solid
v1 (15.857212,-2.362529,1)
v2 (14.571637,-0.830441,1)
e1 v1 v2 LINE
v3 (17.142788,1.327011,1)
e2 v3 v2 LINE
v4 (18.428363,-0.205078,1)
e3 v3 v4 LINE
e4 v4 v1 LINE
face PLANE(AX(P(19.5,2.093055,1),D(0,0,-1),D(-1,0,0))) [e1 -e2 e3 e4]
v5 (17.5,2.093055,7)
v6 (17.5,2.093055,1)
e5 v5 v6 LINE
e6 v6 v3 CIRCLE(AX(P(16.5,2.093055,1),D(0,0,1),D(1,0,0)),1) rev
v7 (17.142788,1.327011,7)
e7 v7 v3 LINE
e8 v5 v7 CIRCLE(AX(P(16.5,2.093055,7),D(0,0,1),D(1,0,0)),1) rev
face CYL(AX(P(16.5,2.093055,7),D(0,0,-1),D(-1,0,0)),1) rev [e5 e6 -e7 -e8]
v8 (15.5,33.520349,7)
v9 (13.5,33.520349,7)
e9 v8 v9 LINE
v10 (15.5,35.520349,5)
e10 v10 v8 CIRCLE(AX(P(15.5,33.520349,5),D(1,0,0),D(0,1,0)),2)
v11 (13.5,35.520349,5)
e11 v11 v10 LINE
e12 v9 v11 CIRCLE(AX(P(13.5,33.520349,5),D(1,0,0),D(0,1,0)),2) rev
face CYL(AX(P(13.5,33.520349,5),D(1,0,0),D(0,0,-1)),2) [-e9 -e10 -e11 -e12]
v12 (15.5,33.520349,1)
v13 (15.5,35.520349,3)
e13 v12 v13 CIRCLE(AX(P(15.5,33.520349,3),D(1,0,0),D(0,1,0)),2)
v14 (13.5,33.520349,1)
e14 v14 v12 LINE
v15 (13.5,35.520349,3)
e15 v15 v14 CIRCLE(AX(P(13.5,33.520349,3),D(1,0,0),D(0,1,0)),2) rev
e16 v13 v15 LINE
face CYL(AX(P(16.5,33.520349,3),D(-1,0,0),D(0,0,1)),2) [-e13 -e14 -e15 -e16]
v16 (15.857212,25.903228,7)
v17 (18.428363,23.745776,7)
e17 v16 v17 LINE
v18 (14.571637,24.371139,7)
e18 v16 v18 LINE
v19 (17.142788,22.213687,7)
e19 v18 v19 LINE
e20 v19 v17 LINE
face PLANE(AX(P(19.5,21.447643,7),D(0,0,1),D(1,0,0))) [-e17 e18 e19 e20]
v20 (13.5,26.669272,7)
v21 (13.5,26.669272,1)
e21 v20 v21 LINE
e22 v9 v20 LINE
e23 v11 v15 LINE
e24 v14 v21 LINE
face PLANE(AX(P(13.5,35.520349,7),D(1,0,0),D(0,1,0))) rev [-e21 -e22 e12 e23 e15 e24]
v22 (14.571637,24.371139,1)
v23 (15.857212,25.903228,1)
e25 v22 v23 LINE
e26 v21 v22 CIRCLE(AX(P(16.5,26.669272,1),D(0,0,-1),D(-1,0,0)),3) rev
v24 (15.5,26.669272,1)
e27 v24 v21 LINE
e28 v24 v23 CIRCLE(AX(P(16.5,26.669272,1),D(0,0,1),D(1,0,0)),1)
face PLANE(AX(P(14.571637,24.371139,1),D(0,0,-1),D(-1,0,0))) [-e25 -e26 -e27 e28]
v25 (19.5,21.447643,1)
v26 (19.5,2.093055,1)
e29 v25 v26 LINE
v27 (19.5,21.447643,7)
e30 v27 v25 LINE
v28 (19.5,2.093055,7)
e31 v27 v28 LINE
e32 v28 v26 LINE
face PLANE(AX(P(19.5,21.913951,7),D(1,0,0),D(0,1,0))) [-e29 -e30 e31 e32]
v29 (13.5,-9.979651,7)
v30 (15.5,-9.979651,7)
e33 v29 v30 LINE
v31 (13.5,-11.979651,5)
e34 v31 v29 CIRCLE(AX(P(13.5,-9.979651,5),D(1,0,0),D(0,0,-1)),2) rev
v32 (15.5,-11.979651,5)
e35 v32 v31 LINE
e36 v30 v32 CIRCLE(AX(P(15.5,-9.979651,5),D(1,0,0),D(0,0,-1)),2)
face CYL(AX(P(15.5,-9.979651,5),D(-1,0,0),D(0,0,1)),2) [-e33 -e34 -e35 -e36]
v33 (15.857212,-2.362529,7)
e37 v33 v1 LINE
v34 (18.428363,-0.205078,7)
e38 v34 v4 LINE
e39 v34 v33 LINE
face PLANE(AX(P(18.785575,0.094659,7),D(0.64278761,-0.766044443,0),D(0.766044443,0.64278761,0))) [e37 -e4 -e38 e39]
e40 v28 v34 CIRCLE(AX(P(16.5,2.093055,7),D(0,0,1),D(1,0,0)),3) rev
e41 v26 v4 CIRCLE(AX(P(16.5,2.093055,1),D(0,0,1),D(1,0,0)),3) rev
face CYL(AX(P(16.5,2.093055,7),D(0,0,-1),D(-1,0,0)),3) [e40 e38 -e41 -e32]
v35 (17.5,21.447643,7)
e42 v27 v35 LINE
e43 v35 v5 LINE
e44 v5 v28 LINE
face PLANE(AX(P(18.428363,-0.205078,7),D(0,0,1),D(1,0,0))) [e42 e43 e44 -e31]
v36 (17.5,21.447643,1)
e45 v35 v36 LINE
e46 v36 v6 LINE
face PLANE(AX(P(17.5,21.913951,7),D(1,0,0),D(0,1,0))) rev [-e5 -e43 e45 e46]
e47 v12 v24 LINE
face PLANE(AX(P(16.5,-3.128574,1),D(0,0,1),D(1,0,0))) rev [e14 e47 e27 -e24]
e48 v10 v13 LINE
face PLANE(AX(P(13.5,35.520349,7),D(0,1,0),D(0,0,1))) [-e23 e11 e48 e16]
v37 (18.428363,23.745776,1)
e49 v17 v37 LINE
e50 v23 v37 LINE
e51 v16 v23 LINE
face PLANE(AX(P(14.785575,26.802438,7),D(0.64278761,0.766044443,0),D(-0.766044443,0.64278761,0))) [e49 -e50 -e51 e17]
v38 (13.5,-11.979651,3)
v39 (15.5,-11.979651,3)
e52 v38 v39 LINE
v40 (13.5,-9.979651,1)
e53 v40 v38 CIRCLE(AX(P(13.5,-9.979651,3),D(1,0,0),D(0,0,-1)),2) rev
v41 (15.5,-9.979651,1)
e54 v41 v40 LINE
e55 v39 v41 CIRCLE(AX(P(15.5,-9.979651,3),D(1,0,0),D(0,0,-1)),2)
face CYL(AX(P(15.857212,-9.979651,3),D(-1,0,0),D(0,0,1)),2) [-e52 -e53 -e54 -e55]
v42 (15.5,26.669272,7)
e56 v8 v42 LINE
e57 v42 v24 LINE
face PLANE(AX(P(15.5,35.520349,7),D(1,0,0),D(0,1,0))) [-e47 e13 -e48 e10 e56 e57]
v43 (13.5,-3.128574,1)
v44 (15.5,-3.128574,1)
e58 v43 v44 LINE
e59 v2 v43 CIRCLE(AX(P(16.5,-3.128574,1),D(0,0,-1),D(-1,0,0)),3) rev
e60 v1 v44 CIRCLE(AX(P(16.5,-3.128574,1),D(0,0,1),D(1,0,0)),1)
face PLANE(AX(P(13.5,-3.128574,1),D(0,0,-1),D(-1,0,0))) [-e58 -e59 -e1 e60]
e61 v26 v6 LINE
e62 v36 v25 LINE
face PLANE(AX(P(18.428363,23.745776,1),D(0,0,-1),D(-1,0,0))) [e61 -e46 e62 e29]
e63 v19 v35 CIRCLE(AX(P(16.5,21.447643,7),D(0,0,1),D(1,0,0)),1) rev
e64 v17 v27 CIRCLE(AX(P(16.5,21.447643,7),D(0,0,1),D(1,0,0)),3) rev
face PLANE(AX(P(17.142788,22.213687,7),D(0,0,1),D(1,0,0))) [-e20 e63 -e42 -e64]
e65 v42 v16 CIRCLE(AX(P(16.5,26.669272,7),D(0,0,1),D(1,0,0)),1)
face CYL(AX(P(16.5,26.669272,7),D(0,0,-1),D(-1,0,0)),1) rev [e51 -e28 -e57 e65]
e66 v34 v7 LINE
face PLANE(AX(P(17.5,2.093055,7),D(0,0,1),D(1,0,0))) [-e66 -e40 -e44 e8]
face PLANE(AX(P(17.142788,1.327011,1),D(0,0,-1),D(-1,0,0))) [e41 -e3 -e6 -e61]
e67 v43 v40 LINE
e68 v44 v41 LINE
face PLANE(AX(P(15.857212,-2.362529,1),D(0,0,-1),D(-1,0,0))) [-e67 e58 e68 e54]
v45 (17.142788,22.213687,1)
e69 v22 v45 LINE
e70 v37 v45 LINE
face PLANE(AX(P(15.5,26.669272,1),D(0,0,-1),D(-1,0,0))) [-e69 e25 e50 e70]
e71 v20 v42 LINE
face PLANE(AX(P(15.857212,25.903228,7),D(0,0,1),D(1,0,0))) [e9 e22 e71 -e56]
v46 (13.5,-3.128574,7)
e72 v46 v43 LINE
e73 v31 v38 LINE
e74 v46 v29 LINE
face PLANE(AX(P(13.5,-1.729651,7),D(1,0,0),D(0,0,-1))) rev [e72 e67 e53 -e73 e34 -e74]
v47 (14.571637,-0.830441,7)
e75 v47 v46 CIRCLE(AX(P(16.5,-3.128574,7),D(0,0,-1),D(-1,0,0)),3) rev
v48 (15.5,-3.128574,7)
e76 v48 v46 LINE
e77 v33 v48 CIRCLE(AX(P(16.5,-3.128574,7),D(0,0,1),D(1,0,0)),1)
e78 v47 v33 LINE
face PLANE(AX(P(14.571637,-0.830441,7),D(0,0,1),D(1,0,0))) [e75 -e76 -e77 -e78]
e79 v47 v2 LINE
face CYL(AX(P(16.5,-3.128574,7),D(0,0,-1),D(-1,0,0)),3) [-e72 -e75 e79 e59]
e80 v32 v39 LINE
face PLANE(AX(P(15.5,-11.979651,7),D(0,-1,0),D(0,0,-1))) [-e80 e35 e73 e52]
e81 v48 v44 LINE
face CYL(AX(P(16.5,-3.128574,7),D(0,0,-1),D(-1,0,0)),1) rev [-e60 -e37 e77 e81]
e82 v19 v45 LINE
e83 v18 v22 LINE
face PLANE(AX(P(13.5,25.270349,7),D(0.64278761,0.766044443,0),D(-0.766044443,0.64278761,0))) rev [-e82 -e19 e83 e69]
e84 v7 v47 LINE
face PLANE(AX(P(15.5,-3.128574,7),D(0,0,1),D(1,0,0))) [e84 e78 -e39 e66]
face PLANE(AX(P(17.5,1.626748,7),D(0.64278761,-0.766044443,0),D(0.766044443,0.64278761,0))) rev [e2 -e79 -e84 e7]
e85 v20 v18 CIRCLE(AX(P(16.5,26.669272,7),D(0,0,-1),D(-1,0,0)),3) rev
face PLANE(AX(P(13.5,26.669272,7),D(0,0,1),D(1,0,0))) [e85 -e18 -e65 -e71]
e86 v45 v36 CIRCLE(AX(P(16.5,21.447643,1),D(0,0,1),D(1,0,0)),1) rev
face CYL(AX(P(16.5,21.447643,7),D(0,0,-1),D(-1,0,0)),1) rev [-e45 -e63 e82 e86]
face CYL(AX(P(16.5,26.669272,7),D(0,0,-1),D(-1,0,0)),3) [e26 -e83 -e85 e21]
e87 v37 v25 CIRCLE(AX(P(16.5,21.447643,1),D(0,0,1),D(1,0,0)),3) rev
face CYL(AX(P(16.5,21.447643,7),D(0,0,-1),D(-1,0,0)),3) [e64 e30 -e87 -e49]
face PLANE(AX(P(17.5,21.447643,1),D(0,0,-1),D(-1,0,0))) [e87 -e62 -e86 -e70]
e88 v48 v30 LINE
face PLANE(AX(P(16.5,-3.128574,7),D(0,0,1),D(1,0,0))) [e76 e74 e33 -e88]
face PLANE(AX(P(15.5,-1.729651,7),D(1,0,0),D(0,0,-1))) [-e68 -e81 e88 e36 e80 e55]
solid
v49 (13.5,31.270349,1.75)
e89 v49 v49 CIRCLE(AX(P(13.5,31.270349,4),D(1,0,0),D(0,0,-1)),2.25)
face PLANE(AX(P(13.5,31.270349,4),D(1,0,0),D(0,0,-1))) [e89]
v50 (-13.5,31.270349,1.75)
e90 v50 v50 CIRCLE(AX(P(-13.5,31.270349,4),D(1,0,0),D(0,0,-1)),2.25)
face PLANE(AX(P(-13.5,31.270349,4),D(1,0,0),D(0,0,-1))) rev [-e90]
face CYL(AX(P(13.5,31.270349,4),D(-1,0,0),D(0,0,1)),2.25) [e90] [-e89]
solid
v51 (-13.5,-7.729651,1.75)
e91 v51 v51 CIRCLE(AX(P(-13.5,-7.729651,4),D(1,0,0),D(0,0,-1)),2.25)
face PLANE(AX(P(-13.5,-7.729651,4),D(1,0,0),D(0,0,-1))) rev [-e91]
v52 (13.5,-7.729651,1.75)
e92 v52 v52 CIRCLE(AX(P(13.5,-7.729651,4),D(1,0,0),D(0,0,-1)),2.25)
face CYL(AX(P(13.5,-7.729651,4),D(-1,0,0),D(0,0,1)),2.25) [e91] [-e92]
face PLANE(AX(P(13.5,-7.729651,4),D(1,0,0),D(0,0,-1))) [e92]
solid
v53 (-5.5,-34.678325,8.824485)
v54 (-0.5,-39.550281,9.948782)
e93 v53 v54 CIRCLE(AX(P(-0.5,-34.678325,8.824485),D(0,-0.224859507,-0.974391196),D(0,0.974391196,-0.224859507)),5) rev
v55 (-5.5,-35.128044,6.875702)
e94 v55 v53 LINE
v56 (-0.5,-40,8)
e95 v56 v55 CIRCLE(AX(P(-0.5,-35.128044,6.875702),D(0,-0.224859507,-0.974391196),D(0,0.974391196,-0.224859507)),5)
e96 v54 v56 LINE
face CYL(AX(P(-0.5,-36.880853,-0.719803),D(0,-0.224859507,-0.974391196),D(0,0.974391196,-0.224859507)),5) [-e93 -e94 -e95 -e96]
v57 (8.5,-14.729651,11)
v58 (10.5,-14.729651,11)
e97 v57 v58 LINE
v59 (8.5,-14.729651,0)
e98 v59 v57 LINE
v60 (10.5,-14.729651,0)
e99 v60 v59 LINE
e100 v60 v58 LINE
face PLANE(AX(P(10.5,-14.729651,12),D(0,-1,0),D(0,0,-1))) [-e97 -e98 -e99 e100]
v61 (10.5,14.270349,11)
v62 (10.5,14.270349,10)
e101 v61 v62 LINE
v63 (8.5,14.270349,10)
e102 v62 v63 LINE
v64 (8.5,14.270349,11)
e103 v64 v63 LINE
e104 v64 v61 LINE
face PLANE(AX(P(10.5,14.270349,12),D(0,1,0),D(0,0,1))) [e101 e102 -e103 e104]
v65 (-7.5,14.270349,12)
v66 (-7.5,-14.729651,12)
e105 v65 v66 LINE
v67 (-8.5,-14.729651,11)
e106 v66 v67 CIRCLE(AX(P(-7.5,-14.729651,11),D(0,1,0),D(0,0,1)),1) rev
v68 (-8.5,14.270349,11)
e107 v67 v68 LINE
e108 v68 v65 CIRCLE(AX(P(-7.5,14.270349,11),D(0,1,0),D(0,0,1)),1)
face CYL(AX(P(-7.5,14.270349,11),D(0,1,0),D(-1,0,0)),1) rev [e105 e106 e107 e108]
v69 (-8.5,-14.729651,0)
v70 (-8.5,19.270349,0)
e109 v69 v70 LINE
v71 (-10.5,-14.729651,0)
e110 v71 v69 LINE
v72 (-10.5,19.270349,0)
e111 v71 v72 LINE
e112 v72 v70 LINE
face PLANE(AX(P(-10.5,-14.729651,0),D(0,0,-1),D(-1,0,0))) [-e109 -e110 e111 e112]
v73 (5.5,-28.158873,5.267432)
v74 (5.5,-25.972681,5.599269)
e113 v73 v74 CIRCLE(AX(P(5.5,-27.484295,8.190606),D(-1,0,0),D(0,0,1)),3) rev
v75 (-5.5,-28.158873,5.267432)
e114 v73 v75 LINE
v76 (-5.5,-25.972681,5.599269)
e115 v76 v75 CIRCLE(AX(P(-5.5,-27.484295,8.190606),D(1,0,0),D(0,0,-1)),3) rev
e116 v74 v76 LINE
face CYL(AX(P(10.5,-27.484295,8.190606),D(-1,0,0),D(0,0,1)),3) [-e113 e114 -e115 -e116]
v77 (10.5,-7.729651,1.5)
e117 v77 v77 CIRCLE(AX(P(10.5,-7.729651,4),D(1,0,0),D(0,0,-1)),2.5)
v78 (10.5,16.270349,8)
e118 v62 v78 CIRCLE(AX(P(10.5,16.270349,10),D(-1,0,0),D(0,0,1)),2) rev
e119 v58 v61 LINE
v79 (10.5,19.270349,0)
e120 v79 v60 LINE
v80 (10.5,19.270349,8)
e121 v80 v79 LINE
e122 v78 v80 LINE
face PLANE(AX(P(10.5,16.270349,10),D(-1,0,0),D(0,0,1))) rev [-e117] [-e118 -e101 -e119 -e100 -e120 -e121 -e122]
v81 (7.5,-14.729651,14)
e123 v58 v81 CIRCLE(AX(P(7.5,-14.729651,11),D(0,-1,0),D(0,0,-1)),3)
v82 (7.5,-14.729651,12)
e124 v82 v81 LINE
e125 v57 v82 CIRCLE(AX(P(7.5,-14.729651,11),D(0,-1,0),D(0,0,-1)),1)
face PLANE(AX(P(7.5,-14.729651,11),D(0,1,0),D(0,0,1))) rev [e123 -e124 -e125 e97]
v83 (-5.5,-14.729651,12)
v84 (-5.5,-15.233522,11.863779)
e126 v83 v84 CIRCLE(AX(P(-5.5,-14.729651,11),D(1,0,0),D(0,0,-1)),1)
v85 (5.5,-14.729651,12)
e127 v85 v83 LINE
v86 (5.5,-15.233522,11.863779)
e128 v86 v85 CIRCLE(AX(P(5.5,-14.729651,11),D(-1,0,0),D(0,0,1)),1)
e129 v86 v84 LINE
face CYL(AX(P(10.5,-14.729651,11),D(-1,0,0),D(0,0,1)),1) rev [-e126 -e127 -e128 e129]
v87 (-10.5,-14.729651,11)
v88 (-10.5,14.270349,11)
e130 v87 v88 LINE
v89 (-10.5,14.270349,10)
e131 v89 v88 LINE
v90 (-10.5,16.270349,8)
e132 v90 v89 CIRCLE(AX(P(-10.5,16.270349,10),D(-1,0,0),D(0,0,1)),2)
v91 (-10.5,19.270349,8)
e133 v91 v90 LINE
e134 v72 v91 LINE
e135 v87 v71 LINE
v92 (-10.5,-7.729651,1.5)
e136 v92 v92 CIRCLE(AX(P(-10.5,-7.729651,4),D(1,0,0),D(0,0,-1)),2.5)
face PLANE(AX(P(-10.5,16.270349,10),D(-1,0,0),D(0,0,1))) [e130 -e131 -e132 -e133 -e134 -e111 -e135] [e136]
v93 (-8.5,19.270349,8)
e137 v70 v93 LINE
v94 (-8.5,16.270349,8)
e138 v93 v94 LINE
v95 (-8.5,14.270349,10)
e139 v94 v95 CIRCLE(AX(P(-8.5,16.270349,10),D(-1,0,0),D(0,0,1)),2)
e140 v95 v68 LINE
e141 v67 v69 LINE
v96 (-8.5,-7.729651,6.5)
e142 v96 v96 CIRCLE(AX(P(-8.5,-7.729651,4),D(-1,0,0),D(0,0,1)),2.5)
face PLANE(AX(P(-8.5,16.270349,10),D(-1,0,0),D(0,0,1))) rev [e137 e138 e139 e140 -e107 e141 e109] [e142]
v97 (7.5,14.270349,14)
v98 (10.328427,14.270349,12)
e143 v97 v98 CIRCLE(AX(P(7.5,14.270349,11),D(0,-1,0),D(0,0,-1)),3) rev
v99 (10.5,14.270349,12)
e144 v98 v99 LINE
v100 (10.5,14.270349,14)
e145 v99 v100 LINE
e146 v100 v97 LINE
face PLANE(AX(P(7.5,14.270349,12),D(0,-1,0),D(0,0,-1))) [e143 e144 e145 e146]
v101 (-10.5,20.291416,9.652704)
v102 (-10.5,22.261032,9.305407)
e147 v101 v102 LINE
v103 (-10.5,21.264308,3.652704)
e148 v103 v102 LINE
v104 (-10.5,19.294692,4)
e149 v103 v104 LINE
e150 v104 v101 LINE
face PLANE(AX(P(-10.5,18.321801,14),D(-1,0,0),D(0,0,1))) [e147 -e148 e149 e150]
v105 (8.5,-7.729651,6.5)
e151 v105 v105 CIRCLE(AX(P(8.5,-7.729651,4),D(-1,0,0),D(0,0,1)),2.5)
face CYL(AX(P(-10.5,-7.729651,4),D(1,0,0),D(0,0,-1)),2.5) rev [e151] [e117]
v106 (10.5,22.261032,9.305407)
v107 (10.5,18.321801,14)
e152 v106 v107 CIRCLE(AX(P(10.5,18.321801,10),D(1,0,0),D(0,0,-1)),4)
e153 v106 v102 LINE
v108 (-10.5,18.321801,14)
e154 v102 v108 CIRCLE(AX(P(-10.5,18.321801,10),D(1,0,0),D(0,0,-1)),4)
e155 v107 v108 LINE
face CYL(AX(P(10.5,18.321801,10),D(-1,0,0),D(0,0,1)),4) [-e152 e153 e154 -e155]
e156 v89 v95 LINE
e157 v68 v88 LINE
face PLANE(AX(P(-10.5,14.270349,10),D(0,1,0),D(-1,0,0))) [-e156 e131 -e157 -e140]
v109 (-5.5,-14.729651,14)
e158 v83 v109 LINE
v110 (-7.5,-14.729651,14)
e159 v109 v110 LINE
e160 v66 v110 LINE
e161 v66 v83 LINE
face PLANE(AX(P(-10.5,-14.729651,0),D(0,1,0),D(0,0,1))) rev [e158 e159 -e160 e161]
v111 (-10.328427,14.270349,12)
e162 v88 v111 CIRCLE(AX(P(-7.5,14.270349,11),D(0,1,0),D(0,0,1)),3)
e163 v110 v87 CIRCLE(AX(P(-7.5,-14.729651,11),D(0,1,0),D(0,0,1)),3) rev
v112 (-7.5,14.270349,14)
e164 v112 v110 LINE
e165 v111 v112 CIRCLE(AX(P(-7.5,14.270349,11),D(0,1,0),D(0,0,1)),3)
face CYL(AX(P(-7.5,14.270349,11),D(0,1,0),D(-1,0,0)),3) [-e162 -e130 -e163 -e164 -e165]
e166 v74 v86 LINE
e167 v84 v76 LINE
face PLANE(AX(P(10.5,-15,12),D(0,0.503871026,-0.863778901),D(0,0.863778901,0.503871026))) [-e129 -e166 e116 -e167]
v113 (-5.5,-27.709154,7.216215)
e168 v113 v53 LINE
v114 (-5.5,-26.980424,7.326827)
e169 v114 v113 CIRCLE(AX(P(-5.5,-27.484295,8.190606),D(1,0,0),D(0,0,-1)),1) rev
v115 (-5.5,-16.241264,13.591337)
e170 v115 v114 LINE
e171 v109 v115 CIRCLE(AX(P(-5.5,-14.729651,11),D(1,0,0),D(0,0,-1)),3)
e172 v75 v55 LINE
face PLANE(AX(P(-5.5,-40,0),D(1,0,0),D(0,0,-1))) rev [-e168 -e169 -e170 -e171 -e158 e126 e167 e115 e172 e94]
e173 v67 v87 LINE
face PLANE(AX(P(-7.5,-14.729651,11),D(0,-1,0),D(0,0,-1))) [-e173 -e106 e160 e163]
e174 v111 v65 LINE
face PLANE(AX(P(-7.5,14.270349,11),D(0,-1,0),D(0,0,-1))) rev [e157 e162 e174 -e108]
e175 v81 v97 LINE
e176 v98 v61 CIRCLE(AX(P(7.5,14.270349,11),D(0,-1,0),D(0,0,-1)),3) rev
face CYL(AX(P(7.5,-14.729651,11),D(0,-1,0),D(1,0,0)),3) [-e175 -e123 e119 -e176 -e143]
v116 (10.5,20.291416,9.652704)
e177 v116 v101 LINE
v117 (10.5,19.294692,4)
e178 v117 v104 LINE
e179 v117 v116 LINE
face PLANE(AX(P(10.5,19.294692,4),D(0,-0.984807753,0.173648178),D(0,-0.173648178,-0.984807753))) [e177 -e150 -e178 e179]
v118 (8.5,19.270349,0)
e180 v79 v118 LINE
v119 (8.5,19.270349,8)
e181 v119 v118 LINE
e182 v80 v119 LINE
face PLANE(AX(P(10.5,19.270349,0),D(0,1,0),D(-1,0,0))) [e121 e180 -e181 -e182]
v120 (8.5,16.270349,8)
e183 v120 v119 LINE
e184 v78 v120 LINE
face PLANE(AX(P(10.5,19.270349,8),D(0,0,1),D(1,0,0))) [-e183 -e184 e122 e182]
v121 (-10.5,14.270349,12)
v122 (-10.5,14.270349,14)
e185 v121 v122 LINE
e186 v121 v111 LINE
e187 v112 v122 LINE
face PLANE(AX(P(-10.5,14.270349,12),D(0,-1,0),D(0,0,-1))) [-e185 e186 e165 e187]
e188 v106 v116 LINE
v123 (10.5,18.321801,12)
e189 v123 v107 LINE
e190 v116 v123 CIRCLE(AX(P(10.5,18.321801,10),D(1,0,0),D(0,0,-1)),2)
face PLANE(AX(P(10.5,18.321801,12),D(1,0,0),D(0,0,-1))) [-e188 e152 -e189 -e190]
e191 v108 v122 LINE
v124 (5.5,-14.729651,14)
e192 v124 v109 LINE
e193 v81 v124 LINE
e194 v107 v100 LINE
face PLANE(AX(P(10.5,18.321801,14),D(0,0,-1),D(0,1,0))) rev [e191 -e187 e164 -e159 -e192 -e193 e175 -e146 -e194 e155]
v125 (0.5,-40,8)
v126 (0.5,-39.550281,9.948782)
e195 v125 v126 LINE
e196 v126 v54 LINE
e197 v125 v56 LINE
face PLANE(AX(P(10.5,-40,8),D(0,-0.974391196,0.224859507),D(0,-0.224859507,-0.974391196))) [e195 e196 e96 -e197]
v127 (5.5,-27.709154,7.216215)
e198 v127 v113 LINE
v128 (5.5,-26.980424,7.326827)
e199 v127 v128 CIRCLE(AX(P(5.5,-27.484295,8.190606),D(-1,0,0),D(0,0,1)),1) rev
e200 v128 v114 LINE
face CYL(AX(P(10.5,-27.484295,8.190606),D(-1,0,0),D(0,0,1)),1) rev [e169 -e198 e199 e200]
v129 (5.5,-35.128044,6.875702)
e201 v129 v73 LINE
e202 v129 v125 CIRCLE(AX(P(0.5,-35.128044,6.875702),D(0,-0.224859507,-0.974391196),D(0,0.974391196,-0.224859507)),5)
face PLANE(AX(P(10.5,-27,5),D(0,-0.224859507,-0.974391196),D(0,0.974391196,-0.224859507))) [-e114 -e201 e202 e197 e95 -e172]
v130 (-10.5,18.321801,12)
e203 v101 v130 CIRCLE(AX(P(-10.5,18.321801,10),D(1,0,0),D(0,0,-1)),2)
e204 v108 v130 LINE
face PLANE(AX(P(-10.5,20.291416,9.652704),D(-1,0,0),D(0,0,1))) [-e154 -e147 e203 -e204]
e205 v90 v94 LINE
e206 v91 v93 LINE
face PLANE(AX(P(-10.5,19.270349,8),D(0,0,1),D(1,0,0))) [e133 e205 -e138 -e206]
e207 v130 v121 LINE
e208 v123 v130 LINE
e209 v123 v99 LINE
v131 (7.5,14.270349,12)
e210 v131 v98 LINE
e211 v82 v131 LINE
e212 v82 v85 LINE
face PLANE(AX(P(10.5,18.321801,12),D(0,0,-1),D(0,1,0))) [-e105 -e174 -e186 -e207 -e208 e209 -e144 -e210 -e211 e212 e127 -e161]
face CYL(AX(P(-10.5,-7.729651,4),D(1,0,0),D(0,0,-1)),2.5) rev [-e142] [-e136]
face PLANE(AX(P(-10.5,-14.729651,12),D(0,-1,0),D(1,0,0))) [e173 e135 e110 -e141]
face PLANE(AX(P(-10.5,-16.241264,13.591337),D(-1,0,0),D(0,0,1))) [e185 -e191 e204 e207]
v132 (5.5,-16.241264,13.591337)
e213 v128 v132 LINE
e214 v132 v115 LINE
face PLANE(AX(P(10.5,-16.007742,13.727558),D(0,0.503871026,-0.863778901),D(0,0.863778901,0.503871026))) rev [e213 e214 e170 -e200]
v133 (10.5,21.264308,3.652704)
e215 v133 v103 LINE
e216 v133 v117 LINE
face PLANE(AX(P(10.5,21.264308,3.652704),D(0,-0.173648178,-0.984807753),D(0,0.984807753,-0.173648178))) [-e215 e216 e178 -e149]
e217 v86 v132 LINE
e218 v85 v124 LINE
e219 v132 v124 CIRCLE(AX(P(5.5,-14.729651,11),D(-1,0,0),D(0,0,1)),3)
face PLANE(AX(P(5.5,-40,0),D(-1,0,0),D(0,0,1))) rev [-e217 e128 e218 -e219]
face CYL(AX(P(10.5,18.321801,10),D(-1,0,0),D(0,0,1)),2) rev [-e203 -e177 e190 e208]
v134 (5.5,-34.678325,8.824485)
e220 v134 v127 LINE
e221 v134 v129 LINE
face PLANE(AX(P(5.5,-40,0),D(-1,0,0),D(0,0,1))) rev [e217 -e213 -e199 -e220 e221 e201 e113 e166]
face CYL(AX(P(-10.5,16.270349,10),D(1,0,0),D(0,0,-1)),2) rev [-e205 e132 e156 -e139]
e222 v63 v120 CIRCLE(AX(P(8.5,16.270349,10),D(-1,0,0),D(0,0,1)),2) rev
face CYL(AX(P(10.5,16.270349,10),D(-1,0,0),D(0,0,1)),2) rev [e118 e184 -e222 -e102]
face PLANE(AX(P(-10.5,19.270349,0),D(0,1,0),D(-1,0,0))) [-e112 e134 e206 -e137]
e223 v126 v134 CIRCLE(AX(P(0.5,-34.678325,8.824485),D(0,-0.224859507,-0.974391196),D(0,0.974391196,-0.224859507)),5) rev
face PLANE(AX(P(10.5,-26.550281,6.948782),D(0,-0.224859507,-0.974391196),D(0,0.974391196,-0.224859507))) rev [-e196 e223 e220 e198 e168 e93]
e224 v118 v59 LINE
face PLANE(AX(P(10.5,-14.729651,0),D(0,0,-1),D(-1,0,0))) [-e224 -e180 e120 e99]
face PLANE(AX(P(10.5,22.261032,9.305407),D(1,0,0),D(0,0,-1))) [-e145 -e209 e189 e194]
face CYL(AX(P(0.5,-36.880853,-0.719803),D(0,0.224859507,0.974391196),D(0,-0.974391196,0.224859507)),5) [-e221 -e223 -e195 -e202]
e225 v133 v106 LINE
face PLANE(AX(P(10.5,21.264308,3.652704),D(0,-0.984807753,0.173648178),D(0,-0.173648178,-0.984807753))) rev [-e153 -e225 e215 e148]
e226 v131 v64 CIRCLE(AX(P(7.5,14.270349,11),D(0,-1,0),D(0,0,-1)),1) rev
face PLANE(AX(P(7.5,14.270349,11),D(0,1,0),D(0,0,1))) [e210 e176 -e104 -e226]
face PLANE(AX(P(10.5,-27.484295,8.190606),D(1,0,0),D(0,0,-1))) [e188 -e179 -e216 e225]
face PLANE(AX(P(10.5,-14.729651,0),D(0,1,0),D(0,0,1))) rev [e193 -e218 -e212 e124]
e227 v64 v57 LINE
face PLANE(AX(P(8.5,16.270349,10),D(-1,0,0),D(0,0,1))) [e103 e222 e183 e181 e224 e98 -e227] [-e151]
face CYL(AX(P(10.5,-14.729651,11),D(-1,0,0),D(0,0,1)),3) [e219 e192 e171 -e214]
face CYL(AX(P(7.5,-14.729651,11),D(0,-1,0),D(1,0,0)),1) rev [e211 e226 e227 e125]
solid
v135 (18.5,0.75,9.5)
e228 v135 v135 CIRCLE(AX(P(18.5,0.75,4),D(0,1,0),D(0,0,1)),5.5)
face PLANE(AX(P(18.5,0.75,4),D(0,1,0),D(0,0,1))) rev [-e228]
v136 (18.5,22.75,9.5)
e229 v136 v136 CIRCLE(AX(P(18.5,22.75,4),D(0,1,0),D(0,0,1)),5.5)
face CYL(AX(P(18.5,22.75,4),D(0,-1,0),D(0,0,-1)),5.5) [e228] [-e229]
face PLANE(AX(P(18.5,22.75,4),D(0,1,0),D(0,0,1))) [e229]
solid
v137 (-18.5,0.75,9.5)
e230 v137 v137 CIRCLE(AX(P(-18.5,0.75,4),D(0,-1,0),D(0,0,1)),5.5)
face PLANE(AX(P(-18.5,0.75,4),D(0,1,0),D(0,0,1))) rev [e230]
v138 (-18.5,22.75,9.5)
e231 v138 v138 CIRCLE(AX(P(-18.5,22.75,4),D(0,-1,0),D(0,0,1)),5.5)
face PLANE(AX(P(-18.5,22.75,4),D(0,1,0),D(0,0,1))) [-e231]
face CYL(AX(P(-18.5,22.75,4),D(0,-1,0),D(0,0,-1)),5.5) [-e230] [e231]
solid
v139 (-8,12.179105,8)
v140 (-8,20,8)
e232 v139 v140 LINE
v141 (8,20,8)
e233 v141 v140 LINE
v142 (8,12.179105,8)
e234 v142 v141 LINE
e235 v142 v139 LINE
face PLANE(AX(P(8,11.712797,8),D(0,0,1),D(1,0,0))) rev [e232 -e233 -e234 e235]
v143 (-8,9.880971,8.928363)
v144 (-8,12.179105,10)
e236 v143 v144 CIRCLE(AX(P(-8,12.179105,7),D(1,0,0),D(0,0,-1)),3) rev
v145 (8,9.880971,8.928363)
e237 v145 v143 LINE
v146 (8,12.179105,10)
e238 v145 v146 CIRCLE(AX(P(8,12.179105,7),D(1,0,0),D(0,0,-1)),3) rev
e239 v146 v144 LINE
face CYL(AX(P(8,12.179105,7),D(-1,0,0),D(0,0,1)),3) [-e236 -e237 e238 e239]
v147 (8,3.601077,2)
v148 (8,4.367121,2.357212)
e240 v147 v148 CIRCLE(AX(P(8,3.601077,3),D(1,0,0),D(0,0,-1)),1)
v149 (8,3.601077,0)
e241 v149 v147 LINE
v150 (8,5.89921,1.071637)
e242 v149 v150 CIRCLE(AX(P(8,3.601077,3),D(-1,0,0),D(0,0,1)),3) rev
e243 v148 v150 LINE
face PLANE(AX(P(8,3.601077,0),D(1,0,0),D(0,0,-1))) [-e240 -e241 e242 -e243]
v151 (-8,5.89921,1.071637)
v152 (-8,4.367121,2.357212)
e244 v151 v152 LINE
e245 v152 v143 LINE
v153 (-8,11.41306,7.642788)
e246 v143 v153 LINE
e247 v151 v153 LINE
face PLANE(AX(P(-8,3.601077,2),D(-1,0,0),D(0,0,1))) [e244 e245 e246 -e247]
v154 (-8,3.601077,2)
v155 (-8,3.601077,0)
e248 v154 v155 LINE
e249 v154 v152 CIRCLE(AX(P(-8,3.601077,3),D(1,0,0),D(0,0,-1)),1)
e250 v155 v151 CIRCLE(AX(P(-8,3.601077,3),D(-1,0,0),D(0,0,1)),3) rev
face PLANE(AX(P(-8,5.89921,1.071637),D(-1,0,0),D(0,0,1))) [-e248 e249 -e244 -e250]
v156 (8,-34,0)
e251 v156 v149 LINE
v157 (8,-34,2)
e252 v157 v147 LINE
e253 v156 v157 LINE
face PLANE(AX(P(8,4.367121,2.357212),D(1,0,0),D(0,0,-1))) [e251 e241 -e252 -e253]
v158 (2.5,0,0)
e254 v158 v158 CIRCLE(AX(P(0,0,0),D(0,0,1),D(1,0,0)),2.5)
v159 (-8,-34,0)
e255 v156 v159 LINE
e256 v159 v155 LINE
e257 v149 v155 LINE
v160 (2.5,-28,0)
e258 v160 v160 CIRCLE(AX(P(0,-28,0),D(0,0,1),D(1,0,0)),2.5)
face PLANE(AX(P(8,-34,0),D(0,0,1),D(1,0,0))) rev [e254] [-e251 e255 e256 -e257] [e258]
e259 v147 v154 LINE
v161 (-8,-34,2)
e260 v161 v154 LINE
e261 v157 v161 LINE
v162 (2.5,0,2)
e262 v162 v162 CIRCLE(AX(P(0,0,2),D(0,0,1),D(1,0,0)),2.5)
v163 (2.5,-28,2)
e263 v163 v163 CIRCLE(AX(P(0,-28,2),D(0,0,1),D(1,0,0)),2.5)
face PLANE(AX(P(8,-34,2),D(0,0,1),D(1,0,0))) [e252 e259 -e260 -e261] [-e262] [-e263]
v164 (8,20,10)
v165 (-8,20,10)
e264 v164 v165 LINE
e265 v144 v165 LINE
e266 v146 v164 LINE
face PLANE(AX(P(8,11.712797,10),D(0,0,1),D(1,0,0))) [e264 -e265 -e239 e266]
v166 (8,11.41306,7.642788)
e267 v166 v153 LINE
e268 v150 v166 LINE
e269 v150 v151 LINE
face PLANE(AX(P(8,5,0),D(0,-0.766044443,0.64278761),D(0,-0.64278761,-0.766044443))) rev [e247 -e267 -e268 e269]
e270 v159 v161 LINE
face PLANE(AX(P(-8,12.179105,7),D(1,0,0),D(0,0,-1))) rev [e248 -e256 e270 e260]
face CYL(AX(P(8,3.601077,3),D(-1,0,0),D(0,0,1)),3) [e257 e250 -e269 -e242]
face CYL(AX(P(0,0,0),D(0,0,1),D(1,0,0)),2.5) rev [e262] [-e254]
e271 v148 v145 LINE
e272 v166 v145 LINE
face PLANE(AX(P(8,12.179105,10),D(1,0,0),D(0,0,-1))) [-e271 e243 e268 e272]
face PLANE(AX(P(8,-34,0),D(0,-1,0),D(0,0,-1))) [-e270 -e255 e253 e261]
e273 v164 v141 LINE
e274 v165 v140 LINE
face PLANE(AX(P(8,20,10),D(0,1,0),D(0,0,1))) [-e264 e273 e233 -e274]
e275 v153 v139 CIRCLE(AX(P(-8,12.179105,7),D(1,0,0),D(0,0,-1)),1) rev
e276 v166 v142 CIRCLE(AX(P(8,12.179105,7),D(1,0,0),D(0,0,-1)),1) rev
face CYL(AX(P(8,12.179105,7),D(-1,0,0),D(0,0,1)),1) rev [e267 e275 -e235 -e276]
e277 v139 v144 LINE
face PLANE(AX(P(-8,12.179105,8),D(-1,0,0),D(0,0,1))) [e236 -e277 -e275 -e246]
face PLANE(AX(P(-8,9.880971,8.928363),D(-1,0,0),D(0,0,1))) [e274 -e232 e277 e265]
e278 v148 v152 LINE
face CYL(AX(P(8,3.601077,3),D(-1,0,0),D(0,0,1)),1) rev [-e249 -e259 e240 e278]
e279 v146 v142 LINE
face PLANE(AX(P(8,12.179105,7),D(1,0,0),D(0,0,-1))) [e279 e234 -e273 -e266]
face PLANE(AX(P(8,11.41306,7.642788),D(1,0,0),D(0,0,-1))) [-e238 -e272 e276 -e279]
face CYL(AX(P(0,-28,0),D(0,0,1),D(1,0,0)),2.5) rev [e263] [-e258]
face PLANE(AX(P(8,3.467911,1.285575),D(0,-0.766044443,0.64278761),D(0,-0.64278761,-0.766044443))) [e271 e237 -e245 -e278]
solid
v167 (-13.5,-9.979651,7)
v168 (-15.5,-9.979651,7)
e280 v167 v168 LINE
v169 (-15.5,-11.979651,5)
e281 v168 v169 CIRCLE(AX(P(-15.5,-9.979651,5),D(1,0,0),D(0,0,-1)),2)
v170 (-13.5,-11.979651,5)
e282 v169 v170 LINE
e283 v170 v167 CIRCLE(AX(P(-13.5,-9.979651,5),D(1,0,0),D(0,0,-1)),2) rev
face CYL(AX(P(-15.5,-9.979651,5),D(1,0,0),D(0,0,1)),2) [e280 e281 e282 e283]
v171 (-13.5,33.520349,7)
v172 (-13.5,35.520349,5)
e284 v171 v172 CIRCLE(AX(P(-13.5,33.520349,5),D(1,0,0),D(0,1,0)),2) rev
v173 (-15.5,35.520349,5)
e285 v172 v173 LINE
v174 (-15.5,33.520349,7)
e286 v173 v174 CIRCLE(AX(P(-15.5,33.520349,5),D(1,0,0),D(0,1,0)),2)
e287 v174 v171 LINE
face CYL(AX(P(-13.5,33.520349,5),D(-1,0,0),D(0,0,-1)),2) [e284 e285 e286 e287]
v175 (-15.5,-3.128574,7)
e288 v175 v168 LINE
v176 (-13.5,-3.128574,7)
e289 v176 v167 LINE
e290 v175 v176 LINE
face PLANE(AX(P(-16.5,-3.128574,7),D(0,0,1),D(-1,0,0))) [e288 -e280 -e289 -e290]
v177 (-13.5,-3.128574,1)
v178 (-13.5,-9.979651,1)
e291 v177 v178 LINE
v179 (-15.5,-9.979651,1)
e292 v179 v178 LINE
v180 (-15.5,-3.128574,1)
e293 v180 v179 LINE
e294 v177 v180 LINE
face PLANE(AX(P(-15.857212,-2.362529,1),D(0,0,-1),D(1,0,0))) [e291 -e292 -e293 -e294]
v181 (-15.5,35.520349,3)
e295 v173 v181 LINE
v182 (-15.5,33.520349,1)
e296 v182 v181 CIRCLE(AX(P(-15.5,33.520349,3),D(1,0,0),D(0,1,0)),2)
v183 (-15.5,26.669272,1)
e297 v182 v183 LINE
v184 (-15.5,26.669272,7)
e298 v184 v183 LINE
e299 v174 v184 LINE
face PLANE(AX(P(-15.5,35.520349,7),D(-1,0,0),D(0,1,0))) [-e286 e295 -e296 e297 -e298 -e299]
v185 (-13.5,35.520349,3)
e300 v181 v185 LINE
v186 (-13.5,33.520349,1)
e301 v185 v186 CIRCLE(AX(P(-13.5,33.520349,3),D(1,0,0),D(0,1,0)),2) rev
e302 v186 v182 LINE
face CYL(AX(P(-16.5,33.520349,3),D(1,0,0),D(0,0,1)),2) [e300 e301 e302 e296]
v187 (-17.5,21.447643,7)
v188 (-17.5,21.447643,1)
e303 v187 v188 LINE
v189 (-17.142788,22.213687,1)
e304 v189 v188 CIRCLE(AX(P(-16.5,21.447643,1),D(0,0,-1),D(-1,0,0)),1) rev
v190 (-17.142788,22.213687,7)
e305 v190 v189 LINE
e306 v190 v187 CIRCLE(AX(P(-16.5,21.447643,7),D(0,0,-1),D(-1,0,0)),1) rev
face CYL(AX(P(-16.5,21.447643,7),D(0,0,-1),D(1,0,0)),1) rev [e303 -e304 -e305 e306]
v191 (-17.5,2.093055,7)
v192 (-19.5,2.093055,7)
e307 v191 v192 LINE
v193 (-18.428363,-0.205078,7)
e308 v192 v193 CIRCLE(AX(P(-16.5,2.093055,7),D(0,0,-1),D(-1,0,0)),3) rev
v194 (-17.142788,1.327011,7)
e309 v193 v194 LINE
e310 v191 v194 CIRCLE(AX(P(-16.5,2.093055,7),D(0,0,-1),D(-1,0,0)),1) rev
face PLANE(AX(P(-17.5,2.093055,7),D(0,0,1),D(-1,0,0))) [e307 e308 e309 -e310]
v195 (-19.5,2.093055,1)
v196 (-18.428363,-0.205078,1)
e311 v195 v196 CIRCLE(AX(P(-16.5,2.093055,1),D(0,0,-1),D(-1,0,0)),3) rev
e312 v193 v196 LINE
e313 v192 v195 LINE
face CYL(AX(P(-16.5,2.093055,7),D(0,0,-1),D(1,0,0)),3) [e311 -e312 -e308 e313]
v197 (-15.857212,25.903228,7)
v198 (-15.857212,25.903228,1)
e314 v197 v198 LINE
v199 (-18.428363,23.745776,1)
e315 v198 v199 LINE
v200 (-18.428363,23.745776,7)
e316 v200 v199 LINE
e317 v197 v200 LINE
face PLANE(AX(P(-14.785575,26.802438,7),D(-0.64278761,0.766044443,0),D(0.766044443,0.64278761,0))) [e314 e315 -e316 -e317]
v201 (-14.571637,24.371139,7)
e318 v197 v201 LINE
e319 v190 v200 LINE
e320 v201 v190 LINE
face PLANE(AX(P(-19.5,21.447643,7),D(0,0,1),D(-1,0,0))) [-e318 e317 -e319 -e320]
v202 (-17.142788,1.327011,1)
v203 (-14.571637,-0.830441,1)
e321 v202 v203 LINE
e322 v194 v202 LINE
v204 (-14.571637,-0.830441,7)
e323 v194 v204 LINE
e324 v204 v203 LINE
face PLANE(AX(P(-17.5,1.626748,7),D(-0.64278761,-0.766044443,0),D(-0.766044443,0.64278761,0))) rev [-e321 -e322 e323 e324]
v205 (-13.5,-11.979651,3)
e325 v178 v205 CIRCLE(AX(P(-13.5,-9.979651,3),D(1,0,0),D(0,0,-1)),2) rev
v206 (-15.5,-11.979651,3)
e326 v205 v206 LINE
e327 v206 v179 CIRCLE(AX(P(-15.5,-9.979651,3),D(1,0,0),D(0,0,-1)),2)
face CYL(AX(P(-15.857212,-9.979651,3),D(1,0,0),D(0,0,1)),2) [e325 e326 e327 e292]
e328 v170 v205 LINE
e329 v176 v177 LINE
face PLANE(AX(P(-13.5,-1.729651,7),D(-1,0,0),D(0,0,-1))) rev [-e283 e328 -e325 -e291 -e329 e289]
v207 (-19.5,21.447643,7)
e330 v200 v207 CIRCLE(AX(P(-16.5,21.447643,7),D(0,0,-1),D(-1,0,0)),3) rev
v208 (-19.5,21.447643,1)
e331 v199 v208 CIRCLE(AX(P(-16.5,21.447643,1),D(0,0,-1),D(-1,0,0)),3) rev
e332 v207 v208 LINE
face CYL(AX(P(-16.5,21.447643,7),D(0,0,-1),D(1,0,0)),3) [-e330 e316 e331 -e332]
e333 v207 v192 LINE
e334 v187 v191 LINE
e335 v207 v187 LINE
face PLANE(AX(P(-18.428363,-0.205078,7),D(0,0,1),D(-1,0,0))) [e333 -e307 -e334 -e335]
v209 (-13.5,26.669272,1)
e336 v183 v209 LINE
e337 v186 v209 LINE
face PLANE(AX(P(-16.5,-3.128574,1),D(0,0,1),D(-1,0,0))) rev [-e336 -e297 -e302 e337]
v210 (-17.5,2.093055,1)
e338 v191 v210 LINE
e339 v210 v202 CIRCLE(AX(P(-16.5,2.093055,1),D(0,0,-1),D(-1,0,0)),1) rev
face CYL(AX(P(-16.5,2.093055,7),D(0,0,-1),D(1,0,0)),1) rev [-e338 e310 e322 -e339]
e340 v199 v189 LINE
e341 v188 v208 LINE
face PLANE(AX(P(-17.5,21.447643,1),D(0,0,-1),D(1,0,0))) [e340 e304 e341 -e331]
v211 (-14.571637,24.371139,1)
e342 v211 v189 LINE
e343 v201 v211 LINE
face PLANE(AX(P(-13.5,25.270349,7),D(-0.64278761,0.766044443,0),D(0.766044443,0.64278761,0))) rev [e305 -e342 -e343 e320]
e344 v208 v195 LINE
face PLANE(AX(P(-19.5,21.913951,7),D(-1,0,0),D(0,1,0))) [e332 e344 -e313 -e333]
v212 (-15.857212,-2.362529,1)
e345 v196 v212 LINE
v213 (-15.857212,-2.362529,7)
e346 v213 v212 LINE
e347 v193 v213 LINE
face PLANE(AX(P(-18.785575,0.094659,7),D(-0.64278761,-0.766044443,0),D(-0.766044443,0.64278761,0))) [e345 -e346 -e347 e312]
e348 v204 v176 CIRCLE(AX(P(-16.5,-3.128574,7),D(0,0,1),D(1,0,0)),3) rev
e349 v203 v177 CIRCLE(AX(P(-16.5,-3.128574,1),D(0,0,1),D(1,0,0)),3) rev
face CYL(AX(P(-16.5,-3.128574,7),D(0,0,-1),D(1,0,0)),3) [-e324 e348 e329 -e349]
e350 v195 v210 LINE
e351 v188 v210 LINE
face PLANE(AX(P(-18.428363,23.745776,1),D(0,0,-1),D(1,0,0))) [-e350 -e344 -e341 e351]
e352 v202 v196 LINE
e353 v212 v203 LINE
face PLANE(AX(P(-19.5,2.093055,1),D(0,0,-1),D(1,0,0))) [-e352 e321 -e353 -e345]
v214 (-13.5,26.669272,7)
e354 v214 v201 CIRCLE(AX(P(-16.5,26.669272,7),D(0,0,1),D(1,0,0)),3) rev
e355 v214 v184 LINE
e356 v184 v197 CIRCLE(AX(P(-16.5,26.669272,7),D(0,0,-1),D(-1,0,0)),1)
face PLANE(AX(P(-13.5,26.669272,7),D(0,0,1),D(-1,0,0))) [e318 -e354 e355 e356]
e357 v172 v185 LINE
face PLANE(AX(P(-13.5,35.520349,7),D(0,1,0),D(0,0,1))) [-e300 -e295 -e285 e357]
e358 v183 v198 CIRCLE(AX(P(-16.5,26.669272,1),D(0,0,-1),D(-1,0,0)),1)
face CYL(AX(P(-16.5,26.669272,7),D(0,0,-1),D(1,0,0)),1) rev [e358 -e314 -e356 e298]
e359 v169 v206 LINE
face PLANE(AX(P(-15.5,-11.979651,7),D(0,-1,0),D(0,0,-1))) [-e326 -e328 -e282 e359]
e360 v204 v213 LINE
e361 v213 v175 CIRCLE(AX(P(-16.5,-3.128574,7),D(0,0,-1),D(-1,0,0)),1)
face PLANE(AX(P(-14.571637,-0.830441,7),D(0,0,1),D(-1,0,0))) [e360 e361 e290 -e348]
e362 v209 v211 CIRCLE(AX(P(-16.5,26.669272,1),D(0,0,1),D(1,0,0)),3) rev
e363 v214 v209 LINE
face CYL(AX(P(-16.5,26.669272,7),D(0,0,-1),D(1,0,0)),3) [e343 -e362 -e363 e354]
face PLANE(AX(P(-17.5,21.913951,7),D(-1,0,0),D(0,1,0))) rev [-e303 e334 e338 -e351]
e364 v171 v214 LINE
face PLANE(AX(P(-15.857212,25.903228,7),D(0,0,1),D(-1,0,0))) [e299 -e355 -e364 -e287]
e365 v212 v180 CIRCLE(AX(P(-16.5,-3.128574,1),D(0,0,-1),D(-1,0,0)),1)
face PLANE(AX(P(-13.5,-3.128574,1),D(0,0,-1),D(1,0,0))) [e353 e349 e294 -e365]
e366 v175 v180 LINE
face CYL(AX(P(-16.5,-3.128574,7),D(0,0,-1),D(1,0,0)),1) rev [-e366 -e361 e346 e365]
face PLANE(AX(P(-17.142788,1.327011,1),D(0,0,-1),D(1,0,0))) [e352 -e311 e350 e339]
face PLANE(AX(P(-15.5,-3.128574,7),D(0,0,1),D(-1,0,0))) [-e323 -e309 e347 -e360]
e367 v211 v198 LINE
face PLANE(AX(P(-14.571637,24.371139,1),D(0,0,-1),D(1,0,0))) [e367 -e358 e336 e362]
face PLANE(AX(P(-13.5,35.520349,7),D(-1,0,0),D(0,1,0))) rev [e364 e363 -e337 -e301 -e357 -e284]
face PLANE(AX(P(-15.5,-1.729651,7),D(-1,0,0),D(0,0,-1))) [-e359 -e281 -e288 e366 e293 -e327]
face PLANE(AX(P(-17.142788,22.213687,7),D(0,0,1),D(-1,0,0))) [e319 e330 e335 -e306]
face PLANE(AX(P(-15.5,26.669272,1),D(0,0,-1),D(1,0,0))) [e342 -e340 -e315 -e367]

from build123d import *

# Parameters (mm, degrees)
T_LE_DE_BASE_PLI_E1_DEPTH               = 8
ESQUISSE6_R                             = 2.5
ENL_V_MAT_EXTRU_1_DEPTH                 = 2
T_LE_DE_BASE_PLI_E2_DEPTH               = 10.5
ESQUISSE10_W                            = 5
ESQUISSE10_H                            = 25.270349141
ENL_V_MAT_EXTRU_2_DEPTH                 = 44.660622991
T_LE_PLI_E_SUR_AR_TE1_STRIP_W           = 10
T_LE_PLI_E_SUR_AR_TE1_STRIP_H           = 2
T_LE_PLI_E_SUR_AR_TE1_STRIP_CUT_DEPTH   = 29
T_LE_PLI_E_SUR_AR_TE1_STRIP_2_W         = 10
T_LE_PLI_E_SUR_AR_TE1_STRIP_2_H         = 2
T_LE_PLI_E_SUR_AR_TE1_STRIP_CUT_2_DEPTH = 29
T_LE_PLI_E_SUR_AR_TE1_DEPTH             = 29
T_LE_PLI_E_SUR_AR_TE1_FLAT_DEPTH        = 2
T_LE_PLI_E_SUR_AR_TE1_BEND_DEPTH        = 29
T_LE_PLI_E_SUR_AR_TE1_FLAT_2_DEPTH      = 2
CONG_1_R                                = 5
ESQUISSE17_R                            = 2.5
ENL_V_MAT_EXTRU_3_DEPTH                 = 48.296934362
ESQUISSE18_R                            = 2.25
BOSS_EXTRU_1_DEPTH                      = 13.5
BOSS_EXTRU_1_2_DEPTH                    = 13.5
T_LE_DE_BASE_PLI_E3_DEPTH               = 6
CONG_2_R                                = 2
BOSS_EXTRU_2_START                      = 0.75
ESQUISSE24_R                            = 5.5
BOSS_EXTRU_2_DEPTH                      = 22


# Sheet-metal steps are written as plain solids
with BuildPart() as part:
    # Esquisse1 → Tôle de base pliée1 (new, symmetric)
    with BuildSketch(Plane(origin=(0, 0, 0), x_dir=(0, 0, -1), z_dir=(1, 0, 0))):
        with BuildLine():
            Line((0, -34), (0, 3.601077026))
            ThreePointArc((0, 3.601077026), (-0.281076639, 4.868931811), (-1.071637171, 5.899210355))
            Line((-1.071637171, 5.899210355), (-7.64278761, 11.413060264))
            ThreePointArc((-7.64278761, 11.413060264), (-7.906307787, 11.756486446), (-8, 12.179104708))
            Line((-8, 12.179104708), (-8, 20))
            Line((-8, 20), (-10, 20))
            Line((-10, 20), (-10, 12.179104708))
            ThreePointArc((-10, 12.179104708), (-9.718923361, 10.911249922), (-8.928362829, 9.880971378))
            Line((-8.928362829, 9.880971378), (-2.35721239, 4.367121469))
            ThreePointArc((-2.35721239, 4.367121469), (-2.093692213, 4.023695287), (-2, 3.601077026))
            Line((-2, 3.601077026), (-2, -34))
            Line((-2, -34), (0, -34))
        make_face()
    extrude(amount=T_LE_DE_BASE_PLI_E1_DEPTH, both=True)

    # Esquisse6 → Enlèv. mat.-Extru.1 (cut)
    with BuildSketch(Plane.XY.offset(2)):
        Circle(ESQUISSE6_R)
        with Locations((0, -28)):
            Circle(ESQUISSE6_R)
    extrude(amount=-ENL_V_MAT_EXTRU_1_DEPTH, mode=Mode.SUBTRACT)


with BuildPart() as body_2:
    # Esquisse7 → Tôle de base pliée2 (new, symmetric)
    with BuildSketch(Plane(origin=(0, 0, 0), x_dir=(0, 0, -1), z_dir=(1, 0, 0))):
        with BuildLine():
            Line((-4, 19.294692077), (-9.652703645, 20.291416244))
            ThreePointArc((-9.652703645, 20.291416244), (-11.285575219, 19.853889624), (-12, 18.321800738))
            Line((-12, 18.321800738), (-12, -14.729650859))
            ThreePointArc((-12, -14.729650859), (-11.965344213, -14.990630838), (-11.863778901, -15.233521884))
            Line((-11.863778901, -15.233521884), (-5.599269134, -25.972681485))
            ThreePointArc((-5.599269134, -25.972681485), (-5.224579141, -27.03408834), (-5.26743225, -28.158873081))
            Line((-5.26743225, -28.158873081), (-8, -40))
            Line((-8, -40), (-9.948782391, -39.550280987))
            Line((-9.948782391, -39.550280987), (-7.216214641, -27.709154068))
            ThreePointArc((-7.216214641, -27.709154068), (-7.201930271, -27.334225821), (-7.326826936, -26.980423536))
            Line((-7.326826936, -26.980423536), (-13.591336703, -16.241263935))
            ThreePointArc((-13.591336703, -16.241263935), (-13.89603264, -15.512590796), (-14, -14.729650859))
            Line((-14, -14.729650859), (-14, 18.321800738))
            ThreePointArc((-14, 18.321800738), (-12.571150439, 21.38597851), (-9.305407289, 22.26103175))
            Line((-9.305407289, 22.26103175), (-3.652703645, 21.264307583))
            Line((-3.652703645, 21.264307583), (-4, 19.294692077))
        make_face()
    extrude(amount=T_LE_DE_BASE_PLI_E2_DEPTH, both=True)

    # Esquisse10 → Enlèv. mat.-Extru.2 (cut, through all)
    with BuildSketch(Plane.XY.offset(14)):
        with Locations((-8, -27.36482543)):
            Rectangle(ESQUISSE10_W, ESQUISSE10_H)
        with Locations((8, -27.36482543)):
            Rectangle(ESQUISSE10_W, ESQUISSE10_H)
    extrude(amount=-ENL_V_MAT_EXTRU_2_DEPTH, mode=Mode.SUBTRACT)

    # Tôle pliée sur arête1 strip (across the edge) → Tôle pliée sur arête1 strip cut (cut)
    with BuildSketch(Plane(origin=(10.5, 14.270349141, 12), x_dir=(-1, 0, 0), z_dir=(0, -1, 0))):
        with Locations((-2, -1)):
            Rectangle(T_LE_PLI_E_SUR_AR_TE1_STRIP_W, T_LE_PLI_E_SUR_AR_TE1_STRIP_H)
    extrude(amount=T_LE_PLI_E_SUR_AR_TE1_STRIP_CUT_DEPTH, mode=Mode.SUBTRACT)

    # Tôle pliée sur arête1 strip 2 (across the edge) → Tôle pliée sur arête1 strip cut 2 (cut)
    with BuildSketch(Plane(origin=(-10.5, -14.729650859, 12), x_dir=(1, 0, 0), z_dir=(0, 1, 0))):
        with Locations((-2, -1)):
            Rectangle(T_LE_PLI_E_SUR_AR_TE1_STRIP_2_W, T_LE_PLI_E_SUR_AR_TE1_STRIP_2_H)
    extrude(amount=T_LE_PLI_E_SUR_AR_TE1_STRIP_CUT_2_DEPTH, mode=Mode.SUBTRACT)

    # Tôle pliée sur arête1 bend section (across the edge) → Tôle pliée sur arête1 (add)
    with BuildSketch(Plane(origin=(10.5, 14.270349141, 12), x_dir=(-1, 0, 0), z_dir=(0, -1, 0))):
        with BuildLine():
            Line((0, 1), (2, 1))
            ThreePointArc((2, 1), (2.292893219, 0.292893219), (3, 0))
            Line((3, 0), (3, -2))
            ThreePointArc((3, -2), (0.878679656, -1.121320344), (0, 1))
        make_face()
    extrude(amount=T_LE_PLI_E_SUR_AR_TE1_DEPTH)

    # Tôle pliée sur arête1 profile (on flange) → Tôle pliée sur arête1 flat (add)
    with BuildSketch(Plane(origin=(10.5, 0, 12), x_dir=(0, 1, 0), z_dir=(-1, 0, 0))):
        with BuildLine():
            ThreePointArc((14.270349141, 2), (14.856135579, 3.414213562), (16.270349141, 4))
            Line((16.270349141, 4), (19.270349141, 4))
            Line((19.270349141, 4), (19.270349141, 12))
            Line((19.270349141, 12), (-14.729650859, 12))
            Line((-14.729650859, 12), (-14.729650859, 1))
            Line((-14.729650859, 1), (14.270349141, 1))
            Line((14.270349141, 1), (14.270349141, 2))
        make_face()
    extrude(amount=T_LE_PLI_E_SUR_AR_TE1_FLAT_DEPTH)

    # Tôle pliée sur arête1 bend section 2 (across the edge) → Tôle pliée sur arête1 bend (add)
    with BuildSketch(Plane(origin=(-10.5, -14.729650859, 12), x_dir=(1, 0, 0), z_dir=(0, 1, 0))):
        with BuildLine():
            Line((0, 1), (2, 1))
            ThreePointArc((2, 1), (2.292893219, 0.292893219), (3, 0))
            Line((3, 0), (3, -2))
            ThreePointArc((3, -2), (0.878679656, -1.121320344), (0, 1))
        make_face()
    extrude(amount=T_LE_PLI_E_SUR_AR_TE1_BEND_DEPTH)

    # Tôle pliée sur arête1 profile 2 (on flange) → Tôle pliée sur arête1 flat 2 (add)
    with BuildSketch(Plane(origin=(-10.5, 0, 12), x_dir=(0, -1, 0), z_dir=(1, 0, 0))):
        with BuildLine():
            ThreePointArc((-16.270349141, 4), (-14.856135579, 3.414213562), (-14.270349141, 2))
            Line((-14.270349141, 2), (-14.270349141, 1))
            Line((-14.270349141, 1), (14.729650859, 1))
            Line((14.729650859, 1), (14.729650859, 12))
            Line((14.729650859, 12), (-19.270349141, 12))
            Line((-19.270349141, 12), (-19.270349141, 4))
            Line((-19.270349141, 4), (-16.270349141, 4))
        make_face()
    extrude(amount=T_LE_PLI_E_SUR_AR_TE1_FLAT_2_DEPTH)

    # Congé1
    cong_1_edges = [body_2.edges().sort_by_distance(p)[0] for p in [
        (-5.5, -39.775140493, 8.974391196),
        (5.5, -39.775140493, 8.974391196),
    ]]
    fillet(cong_1_edges, radius=CONG_1_R)

    # Esquisse17 → Enlèv. mat.-Extru.3 (cut, through all)
    with BuildSketch(Plane(origin=(10.5, 0, 0), x_dir=(0, 0, -1), z_dir=(1, 0, 0))):
        with Locations((-4, -7.729650859)):
            Circle(ESQUISSE17_R)
    extrude(amount=-ENL_V_MAT_EXTRU_3_DEPTH, mode=Mode.SUBTRACT)


with BuildPart() as body_3:
    # Esquisse18 → Boss.-Extru.1 (new, symmetric)
    with BuildSketch(Plane(origin=(0, 0, 0), x_dir=(0, 0, -1), z_dir=(1, 0, 0))):
        with Locations((-4, -7.729650859)):
            Circle(ESQUISSE18_R)
    extrude(amount=BOSS_EXTRU_1_DEPTH, both=True)


with BuildPart() as body_4:
    # Esquisse18 → Boss.-Extru.1 2 (new, symmetric)
    with BuildSketch(Plane(origin=(0, 0, 0), x_dir=(0, 0, -1), z_dir=(1, 0, 0))):
        with Locations((-4, 31.270349141)):
            Circle(ESQUISSE18_R)
    extrude(amount=BOSS_EXTRU_1_2_DEPTH, both=True)


with BuildPart() as body_5:
    # Esquisse21 → Tôle de base pliée3 (new body)
    with BuildSketch(Plane.XY):
        with BuildLine():
            Line((13.5, 35.520349141), (13.5, 26.669272116))
            ThreePointArc((13.5, 26.669272116), (13.781076639, 25.401417331), (14.571637171, 24.371138786))
            Line((14.571637171, 24.371138786), (17.14278761, 22.213687402))
            ThreePointArc((17.14278761, 22.213687402), (17.406307787, 21.87026122), (17.5, 21.447642958))
            Line((17.5, 21.447642958), (17.5, 2.093055324))
            ThreePointArc((17.5, 2.093055324), (17.406307787, 1.670437062), (17.14278761, 1.327010881))
            Line((17.14278761, 1.327010881), (14.571637171, -0.830440504))
            ThreePointArc((14.571637171, -0.830440504), (13.781076639, -1.860719048), (13.5, -3.128573833))
            Line((13.5, -3.128573833), (13.5, -11.979650859))
            Line((13.5, -11.979650859), (15.5, -11.979650859))
            Line((15.5, -11.979650859), (15.5, -3.128573833))
            ThreePointArc((15.5, -3.128573833), (15.593692213, -2.705955571), (15.85721239, -2.36252939))
            Line((15.85721239, -2.36252939), (18.428362829, -0.205078005))
            ThreePointArc((18.428362829, -0.205078005), (19.218923361, 0.825200539), (19.5, 2.093055324))
            Line((19.5, 2.093055324), (19.5, 21.447642958))
            ThreePointArc((19.5, 21.447642958), (19.218923361, 22.715497744), (18.428362829, 23.745776288))
            Line((18.428362829, 23.745776288), (15.85721239, 25.903227673))
            ThreePointArc((15.85721239, 25.903227673), (15.593692213, 26.246653854), (15.5, 26.669272116))
            Line((15.5, 26.669272116), (15.5, 35.520349141))
            Line((15.5, 35.520349141), (13.5, 35.520349141))
        make_face()
    extrude(amount=T_LE_DE_BASE_PLI_E3_DEPTH)


with BuildPart() as body_5_1:
    # Corps-Déplacer/Copier1: moved
    add(body_5.part.moved(Location((0, 0, 1))))

    # Congé2
    cong_2_edges = [body_5_1.edges().sort_by_distance(p)[0] for p in [
        (14.5, 35.520349141, 1),
        (14.5, -11.979650859, 1),
        (14.5, 35.520349141, 7),
        (14.5, -11.979650859, 7),
    ]]
    fillet(cong_2_edges, radius=CONG_2_R)


with BuildPart() as body_6:
    # Esquisse24 → Boss.-Extru.2 (new body)
    with BuildSketch(Plane(origin=(0, 0, 0), x_dir=(1, 0, 0), z_dir=(0, 1, 0)).offset(BOSS_EXTRU_2_START)):
        with Locations(Location((18.5, -4, 0), (0, 0, 270))):
            Circle(ESQUISSE24_R)
    extrude(amount=BOSS_EXTRU_2_DEPTH)


with BuildPart() as body_7:
    # Symétrie1: mirrored copy
    add(body_5_1.part.mirror(Plane(origin=(0, 0, 0), x_dir=(0, 0, 1), z_dir=(1, 0, 0))))


with BuildPart() as body_8:
    # Sym_trie1 2: mirrored copy
    add(body_6.part.mirror(Plane(origin=(0, 0, 0), x_dir=(0, 0, 1), z_dir=(1, 0, 0))))


solid = Compound([part.part, body_2.part, body_3.part, body_4.part, body_5_1.part, body_6.part, body_7.part, body_8.part])
